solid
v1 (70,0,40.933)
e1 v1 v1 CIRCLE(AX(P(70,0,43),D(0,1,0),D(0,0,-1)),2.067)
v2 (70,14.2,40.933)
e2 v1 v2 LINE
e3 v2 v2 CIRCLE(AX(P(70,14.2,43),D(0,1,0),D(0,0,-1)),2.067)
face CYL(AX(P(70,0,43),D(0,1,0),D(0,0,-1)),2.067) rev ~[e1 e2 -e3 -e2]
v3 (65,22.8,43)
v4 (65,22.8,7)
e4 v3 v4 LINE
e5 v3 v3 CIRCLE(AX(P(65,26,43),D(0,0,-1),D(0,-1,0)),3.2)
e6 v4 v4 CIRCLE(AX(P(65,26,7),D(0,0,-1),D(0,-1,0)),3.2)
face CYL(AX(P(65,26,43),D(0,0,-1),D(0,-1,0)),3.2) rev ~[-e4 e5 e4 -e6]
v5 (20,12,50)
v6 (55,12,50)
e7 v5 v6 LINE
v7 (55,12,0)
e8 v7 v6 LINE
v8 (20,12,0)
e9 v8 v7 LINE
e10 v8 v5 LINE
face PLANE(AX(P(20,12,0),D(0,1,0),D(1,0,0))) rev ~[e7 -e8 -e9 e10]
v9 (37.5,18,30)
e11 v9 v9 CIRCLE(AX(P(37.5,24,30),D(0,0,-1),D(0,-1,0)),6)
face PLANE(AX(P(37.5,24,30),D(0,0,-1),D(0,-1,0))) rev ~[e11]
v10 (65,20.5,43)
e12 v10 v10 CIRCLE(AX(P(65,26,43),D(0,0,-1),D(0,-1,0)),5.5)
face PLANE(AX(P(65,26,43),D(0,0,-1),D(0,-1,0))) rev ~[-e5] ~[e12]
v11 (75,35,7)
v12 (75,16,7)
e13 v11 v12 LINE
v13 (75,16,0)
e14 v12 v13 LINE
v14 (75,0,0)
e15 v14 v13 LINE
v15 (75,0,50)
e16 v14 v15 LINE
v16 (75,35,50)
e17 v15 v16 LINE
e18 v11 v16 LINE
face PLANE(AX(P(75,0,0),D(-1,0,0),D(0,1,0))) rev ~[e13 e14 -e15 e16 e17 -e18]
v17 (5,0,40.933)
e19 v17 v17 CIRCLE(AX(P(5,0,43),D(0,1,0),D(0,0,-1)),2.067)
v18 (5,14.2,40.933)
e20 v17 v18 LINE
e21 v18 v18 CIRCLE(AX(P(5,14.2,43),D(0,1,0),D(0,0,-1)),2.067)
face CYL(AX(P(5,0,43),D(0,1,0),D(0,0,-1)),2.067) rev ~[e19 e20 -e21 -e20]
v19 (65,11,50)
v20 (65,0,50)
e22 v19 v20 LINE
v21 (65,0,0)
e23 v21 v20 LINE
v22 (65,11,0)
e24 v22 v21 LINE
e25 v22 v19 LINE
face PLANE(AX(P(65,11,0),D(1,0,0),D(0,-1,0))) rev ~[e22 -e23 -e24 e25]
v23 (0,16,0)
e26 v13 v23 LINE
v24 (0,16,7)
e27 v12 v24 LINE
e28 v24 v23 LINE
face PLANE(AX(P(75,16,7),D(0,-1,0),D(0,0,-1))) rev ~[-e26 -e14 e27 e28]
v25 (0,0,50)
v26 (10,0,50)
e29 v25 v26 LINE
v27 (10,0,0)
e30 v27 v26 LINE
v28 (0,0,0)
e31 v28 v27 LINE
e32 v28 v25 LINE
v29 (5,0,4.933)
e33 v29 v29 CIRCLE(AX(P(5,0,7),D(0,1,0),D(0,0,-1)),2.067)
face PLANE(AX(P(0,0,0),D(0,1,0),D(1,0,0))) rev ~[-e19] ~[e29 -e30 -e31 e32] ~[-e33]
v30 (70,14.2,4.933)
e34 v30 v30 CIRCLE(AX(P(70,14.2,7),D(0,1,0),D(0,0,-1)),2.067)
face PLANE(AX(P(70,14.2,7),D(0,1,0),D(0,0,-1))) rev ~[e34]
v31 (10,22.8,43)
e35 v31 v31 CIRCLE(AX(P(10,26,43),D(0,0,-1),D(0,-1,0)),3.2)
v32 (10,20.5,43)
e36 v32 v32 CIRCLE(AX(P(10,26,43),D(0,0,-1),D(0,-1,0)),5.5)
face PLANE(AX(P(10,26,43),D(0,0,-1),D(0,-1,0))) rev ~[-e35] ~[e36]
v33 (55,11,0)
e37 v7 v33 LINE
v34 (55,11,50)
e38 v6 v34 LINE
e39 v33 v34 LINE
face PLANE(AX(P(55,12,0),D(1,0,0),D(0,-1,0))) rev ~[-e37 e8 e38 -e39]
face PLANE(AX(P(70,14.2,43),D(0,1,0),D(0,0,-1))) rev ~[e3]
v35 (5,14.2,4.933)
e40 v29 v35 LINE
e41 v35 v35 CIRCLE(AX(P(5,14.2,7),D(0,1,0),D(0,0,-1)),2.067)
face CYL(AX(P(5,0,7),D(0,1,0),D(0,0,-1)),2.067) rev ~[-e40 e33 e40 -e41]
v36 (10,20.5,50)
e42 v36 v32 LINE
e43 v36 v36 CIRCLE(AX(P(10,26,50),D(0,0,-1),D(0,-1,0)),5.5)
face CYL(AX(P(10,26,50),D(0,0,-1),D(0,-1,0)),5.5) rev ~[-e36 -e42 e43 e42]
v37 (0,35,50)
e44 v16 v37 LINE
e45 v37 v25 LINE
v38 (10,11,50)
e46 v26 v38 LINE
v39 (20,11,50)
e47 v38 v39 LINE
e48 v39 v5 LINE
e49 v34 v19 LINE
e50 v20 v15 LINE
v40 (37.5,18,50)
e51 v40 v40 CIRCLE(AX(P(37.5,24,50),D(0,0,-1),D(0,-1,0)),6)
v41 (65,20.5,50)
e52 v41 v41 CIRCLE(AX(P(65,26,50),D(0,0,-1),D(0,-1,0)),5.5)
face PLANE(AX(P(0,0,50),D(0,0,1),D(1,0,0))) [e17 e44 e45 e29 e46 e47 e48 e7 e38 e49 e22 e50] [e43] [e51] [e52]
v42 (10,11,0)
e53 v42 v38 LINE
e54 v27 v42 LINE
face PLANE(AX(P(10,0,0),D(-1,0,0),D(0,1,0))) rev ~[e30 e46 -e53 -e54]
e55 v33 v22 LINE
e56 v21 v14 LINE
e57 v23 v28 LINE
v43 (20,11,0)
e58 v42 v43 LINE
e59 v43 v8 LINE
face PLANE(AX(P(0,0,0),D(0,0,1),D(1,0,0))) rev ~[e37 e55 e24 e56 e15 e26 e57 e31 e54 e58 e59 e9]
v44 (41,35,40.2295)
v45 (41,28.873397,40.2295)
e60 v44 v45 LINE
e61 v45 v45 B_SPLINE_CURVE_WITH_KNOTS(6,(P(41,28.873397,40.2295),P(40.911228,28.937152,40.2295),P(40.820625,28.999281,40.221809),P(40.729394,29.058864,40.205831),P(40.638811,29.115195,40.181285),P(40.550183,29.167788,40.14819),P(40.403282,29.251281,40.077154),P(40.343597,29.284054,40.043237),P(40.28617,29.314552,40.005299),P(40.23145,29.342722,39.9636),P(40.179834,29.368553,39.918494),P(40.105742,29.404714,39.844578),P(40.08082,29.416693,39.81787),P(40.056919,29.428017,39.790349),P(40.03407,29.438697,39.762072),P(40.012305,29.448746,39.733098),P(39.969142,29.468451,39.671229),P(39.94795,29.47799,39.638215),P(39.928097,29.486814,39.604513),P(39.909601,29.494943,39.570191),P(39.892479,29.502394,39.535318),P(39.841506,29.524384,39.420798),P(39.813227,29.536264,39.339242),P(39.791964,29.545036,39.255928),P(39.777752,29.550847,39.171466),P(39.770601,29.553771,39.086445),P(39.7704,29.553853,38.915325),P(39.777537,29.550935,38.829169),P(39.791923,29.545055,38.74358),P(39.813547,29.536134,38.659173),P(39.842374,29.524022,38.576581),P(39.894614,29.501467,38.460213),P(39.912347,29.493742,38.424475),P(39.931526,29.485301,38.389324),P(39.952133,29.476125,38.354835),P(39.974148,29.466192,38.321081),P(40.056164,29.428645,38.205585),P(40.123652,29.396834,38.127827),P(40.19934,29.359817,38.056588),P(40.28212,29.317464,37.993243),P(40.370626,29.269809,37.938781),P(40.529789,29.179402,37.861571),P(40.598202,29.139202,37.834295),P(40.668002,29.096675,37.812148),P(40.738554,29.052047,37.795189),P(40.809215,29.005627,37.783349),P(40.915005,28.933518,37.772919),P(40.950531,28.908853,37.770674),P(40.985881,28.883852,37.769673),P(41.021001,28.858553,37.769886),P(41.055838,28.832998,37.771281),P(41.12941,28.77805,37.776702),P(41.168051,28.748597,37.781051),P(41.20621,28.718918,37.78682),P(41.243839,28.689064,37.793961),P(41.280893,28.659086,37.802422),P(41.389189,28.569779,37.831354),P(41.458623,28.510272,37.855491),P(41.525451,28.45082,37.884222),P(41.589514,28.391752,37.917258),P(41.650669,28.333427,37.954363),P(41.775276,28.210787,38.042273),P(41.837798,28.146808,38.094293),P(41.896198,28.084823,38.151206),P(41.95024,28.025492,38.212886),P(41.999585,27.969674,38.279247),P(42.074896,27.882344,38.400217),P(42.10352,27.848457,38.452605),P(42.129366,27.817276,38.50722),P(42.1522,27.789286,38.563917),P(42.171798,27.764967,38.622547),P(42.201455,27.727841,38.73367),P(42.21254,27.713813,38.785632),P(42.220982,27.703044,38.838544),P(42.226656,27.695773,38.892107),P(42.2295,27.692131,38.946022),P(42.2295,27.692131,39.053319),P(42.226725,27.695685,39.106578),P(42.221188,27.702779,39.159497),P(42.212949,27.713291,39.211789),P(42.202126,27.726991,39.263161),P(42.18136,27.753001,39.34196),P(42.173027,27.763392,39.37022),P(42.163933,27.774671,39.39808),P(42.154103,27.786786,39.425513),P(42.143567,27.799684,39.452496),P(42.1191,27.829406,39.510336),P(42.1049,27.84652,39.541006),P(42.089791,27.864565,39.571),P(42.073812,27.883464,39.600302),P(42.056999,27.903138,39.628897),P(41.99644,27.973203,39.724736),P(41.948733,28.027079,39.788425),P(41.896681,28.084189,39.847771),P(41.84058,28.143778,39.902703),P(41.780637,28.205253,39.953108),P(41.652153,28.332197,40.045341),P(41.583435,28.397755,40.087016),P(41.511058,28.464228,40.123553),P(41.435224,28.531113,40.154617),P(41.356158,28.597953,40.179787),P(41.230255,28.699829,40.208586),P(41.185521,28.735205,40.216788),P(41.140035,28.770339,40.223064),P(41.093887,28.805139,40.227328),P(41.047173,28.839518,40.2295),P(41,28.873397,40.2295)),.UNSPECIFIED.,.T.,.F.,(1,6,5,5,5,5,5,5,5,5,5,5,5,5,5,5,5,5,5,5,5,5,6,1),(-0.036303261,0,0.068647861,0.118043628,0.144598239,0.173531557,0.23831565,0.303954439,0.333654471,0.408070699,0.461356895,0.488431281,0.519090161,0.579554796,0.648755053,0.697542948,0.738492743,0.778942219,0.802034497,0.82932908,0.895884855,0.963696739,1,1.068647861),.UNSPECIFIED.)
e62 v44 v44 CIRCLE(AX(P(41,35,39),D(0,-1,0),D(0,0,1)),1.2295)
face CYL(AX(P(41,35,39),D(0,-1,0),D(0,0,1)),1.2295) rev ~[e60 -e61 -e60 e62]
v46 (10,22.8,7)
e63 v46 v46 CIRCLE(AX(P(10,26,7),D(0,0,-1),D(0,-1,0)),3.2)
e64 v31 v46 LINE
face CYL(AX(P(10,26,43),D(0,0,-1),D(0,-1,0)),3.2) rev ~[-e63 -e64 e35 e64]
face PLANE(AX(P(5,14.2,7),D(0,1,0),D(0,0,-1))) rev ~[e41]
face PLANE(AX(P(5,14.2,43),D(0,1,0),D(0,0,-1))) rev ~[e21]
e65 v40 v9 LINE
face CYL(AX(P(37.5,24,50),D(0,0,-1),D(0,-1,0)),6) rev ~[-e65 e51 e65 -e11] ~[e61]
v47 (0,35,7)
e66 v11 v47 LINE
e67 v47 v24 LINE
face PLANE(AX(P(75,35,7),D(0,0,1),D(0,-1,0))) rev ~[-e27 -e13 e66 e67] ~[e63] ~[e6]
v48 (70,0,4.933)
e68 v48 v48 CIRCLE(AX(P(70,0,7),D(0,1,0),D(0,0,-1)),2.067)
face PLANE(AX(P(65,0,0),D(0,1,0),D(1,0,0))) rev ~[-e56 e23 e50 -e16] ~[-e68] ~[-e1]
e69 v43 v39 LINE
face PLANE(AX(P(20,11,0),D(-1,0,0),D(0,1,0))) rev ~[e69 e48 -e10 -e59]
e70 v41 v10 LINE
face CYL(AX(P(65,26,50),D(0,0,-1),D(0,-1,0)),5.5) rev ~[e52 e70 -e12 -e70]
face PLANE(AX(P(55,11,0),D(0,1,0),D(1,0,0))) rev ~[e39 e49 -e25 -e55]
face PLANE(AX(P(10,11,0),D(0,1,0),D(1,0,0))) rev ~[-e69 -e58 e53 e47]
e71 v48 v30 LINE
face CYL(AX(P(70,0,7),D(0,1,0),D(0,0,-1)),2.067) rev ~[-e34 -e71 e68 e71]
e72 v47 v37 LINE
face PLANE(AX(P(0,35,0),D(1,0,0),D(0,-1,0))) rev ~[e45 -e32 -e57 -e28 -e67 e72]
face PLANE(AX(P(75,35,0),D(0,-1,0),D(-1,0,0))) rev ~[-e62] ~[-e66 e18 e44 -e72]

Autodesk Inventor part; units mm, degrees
ref_plane "YZ Plane" through (0, 0, 0) normal (1, 0, 0) x (0, 1, 0)
ref_plane "XZ Plane" through (0, 0, 0) normal (0, 1, 0) x (-1, 0, 0)
ref_plane "XY Plane" through (0, 0, 0) normal (0, 0, 1) x (1, 0, 0)
sketch "Sketch1" plane through (0, 0, 0) normal (0, 0, 1) x (1, 0, 0)
  line L0 (75, 0) -> (75, 35)
  line L1 (75, 35) -> (0, 35)
  line L2 (0, 35) -> (0, 0)
  line L3 (0, 0) -> (10, 0)
  line L4 (10, 0) -> (10, 11)
  line L5 (10, 11) -> (20, 11)
  line L6 (20, 11) -> (20, 12)
  line L7 (20, 12) -> (55, 12)
  line L8 (55, 12) -> (55, 11)
  line L9 (55, 11) -> (65, 11)
  line L10 (65, 11) -> (65, 0)
  line L11 (65, 0) -> (75, 0)
  dimension "d0" = 75
  dimension "d1" = 35
  dimension "d2" = 10
  dimension "d3" = 11
  dimension "d4" = 10
  dimension "d5" = 90
  dimension "d6" = 1
  dimension "d7" = 35
  dimension "d8" = 10
  dimension "d9" = 11
extrude "Extrusion1" add sketch "Sketch1" along normal blind 50
sketch "Sketch2" plane through (75, 0, 0) normal (1, 0, 0) x (0, 0, -1)
  line L0 (0, 35) -> (-50, 35) projected
  line L1 (0, 35) -> (-7, 35)
  line L2 (-7, 35) -> (-7, 16)
  line L3 (-7, 16) -> (0, 16)
  line L4 (0, 16) -> (0, 35)
  point P0 (0, 0)
  dimension "d12" = 7
  dimension "d13" = 19
extrude "Extrusion2" cut sketch "Sketch2" against normal through all
sketch "Sketch3" plane through (0, 0, 50) normal (0, 0, 1) x (1, 0, 0)
  line L0 (0, 0) -> (10, 0) projected
  line L1 (65, 0) -> (75, 0) projected
  line L2 (75, 0) -> (75, 35) projected
  line L3 (0, 35) -> (0, 0) projected
  point P0 (10, 26)
  point P1 (65, 26)
  dimension "d16" = 26
  dimension "d17" = 26
  dimension "d18" = 10
  dimension "d19" = 10
hole "Hole1" at (10, 26, 50) at (65, 26, 50) direction (0, 0, -1) diameter 6.4 end through all counterbore diameter 11 counterbore depth 7
sketch "Sketch4" plane through (0, 0, 50) normal (0, 0, 1) x (1, 0, 0)
  line L0 (65, 0) -> (75, 0) projected
  line L1 (75, 0) -> (75, 35) projected
  point P0 (0, 0)
  point P1 (37.5, 24)
  dimension "d27" = 24
  dimension "d28" = 37.5
hole "Hole2" at (37.5, 24, 50) direction (0, 0, -1) diameter 12 depth 20
sketch "Sketch5" plane through (0, 35, 50) normal (0, 1, 0) x (1, 0, 0)
  line L0 (75, 43) -> (75, 0) projected
  line L1 (75, 0) -> (0, 0) projected
  point P0 (0, 50)
  point P1 (41, 11)
  dimension "d36" = 34
  dimension "d44" = 11
hole "Hole3" at (41, 35, 39) direction (0, -1, 0) diameter 2.459 depth 8.8 thread size "M3x0.5" class "6H" standard "ISO Metric profile"
sketch "Sketch6" plane through (0, 0, 0) normal (0, -1, 0) x (1, 0, 0)
  line L0 (75, 0) -> (75, 50) projected
  line L1 (0, 0) -> (0, 50) projected
  line L2 (0, 50) -> (10, 50) projected
  line L3 (0, 0) -> (10, 0) projected
  line L4 (65, 50) -> (75, 50) projected
  point P0 (5, 43)
  point P1 (5, 7)
  point P2 (70, 43)
  point P3 (70, 7)
  dimension "d45" = 5
  dimension "d46" = 5
  dimension "d47" = 5
  dimension "d48" = 5
  dimension "d50" = 7
  dimension "d51" = 7
  dimension "d52" = 7
  dimension "d60" = 36
hole "Hole4" at (5, 0, 43) at (5, 0, 7) at (70, 0, 43) at (70, 0, 7) direction (0, 1, 0) diameter 4.134 depth 14.2 thread size "M5x0.8" class "6H" standard "ISO Metric profile"
properties part number "lose back" material "Steel, Mild"
